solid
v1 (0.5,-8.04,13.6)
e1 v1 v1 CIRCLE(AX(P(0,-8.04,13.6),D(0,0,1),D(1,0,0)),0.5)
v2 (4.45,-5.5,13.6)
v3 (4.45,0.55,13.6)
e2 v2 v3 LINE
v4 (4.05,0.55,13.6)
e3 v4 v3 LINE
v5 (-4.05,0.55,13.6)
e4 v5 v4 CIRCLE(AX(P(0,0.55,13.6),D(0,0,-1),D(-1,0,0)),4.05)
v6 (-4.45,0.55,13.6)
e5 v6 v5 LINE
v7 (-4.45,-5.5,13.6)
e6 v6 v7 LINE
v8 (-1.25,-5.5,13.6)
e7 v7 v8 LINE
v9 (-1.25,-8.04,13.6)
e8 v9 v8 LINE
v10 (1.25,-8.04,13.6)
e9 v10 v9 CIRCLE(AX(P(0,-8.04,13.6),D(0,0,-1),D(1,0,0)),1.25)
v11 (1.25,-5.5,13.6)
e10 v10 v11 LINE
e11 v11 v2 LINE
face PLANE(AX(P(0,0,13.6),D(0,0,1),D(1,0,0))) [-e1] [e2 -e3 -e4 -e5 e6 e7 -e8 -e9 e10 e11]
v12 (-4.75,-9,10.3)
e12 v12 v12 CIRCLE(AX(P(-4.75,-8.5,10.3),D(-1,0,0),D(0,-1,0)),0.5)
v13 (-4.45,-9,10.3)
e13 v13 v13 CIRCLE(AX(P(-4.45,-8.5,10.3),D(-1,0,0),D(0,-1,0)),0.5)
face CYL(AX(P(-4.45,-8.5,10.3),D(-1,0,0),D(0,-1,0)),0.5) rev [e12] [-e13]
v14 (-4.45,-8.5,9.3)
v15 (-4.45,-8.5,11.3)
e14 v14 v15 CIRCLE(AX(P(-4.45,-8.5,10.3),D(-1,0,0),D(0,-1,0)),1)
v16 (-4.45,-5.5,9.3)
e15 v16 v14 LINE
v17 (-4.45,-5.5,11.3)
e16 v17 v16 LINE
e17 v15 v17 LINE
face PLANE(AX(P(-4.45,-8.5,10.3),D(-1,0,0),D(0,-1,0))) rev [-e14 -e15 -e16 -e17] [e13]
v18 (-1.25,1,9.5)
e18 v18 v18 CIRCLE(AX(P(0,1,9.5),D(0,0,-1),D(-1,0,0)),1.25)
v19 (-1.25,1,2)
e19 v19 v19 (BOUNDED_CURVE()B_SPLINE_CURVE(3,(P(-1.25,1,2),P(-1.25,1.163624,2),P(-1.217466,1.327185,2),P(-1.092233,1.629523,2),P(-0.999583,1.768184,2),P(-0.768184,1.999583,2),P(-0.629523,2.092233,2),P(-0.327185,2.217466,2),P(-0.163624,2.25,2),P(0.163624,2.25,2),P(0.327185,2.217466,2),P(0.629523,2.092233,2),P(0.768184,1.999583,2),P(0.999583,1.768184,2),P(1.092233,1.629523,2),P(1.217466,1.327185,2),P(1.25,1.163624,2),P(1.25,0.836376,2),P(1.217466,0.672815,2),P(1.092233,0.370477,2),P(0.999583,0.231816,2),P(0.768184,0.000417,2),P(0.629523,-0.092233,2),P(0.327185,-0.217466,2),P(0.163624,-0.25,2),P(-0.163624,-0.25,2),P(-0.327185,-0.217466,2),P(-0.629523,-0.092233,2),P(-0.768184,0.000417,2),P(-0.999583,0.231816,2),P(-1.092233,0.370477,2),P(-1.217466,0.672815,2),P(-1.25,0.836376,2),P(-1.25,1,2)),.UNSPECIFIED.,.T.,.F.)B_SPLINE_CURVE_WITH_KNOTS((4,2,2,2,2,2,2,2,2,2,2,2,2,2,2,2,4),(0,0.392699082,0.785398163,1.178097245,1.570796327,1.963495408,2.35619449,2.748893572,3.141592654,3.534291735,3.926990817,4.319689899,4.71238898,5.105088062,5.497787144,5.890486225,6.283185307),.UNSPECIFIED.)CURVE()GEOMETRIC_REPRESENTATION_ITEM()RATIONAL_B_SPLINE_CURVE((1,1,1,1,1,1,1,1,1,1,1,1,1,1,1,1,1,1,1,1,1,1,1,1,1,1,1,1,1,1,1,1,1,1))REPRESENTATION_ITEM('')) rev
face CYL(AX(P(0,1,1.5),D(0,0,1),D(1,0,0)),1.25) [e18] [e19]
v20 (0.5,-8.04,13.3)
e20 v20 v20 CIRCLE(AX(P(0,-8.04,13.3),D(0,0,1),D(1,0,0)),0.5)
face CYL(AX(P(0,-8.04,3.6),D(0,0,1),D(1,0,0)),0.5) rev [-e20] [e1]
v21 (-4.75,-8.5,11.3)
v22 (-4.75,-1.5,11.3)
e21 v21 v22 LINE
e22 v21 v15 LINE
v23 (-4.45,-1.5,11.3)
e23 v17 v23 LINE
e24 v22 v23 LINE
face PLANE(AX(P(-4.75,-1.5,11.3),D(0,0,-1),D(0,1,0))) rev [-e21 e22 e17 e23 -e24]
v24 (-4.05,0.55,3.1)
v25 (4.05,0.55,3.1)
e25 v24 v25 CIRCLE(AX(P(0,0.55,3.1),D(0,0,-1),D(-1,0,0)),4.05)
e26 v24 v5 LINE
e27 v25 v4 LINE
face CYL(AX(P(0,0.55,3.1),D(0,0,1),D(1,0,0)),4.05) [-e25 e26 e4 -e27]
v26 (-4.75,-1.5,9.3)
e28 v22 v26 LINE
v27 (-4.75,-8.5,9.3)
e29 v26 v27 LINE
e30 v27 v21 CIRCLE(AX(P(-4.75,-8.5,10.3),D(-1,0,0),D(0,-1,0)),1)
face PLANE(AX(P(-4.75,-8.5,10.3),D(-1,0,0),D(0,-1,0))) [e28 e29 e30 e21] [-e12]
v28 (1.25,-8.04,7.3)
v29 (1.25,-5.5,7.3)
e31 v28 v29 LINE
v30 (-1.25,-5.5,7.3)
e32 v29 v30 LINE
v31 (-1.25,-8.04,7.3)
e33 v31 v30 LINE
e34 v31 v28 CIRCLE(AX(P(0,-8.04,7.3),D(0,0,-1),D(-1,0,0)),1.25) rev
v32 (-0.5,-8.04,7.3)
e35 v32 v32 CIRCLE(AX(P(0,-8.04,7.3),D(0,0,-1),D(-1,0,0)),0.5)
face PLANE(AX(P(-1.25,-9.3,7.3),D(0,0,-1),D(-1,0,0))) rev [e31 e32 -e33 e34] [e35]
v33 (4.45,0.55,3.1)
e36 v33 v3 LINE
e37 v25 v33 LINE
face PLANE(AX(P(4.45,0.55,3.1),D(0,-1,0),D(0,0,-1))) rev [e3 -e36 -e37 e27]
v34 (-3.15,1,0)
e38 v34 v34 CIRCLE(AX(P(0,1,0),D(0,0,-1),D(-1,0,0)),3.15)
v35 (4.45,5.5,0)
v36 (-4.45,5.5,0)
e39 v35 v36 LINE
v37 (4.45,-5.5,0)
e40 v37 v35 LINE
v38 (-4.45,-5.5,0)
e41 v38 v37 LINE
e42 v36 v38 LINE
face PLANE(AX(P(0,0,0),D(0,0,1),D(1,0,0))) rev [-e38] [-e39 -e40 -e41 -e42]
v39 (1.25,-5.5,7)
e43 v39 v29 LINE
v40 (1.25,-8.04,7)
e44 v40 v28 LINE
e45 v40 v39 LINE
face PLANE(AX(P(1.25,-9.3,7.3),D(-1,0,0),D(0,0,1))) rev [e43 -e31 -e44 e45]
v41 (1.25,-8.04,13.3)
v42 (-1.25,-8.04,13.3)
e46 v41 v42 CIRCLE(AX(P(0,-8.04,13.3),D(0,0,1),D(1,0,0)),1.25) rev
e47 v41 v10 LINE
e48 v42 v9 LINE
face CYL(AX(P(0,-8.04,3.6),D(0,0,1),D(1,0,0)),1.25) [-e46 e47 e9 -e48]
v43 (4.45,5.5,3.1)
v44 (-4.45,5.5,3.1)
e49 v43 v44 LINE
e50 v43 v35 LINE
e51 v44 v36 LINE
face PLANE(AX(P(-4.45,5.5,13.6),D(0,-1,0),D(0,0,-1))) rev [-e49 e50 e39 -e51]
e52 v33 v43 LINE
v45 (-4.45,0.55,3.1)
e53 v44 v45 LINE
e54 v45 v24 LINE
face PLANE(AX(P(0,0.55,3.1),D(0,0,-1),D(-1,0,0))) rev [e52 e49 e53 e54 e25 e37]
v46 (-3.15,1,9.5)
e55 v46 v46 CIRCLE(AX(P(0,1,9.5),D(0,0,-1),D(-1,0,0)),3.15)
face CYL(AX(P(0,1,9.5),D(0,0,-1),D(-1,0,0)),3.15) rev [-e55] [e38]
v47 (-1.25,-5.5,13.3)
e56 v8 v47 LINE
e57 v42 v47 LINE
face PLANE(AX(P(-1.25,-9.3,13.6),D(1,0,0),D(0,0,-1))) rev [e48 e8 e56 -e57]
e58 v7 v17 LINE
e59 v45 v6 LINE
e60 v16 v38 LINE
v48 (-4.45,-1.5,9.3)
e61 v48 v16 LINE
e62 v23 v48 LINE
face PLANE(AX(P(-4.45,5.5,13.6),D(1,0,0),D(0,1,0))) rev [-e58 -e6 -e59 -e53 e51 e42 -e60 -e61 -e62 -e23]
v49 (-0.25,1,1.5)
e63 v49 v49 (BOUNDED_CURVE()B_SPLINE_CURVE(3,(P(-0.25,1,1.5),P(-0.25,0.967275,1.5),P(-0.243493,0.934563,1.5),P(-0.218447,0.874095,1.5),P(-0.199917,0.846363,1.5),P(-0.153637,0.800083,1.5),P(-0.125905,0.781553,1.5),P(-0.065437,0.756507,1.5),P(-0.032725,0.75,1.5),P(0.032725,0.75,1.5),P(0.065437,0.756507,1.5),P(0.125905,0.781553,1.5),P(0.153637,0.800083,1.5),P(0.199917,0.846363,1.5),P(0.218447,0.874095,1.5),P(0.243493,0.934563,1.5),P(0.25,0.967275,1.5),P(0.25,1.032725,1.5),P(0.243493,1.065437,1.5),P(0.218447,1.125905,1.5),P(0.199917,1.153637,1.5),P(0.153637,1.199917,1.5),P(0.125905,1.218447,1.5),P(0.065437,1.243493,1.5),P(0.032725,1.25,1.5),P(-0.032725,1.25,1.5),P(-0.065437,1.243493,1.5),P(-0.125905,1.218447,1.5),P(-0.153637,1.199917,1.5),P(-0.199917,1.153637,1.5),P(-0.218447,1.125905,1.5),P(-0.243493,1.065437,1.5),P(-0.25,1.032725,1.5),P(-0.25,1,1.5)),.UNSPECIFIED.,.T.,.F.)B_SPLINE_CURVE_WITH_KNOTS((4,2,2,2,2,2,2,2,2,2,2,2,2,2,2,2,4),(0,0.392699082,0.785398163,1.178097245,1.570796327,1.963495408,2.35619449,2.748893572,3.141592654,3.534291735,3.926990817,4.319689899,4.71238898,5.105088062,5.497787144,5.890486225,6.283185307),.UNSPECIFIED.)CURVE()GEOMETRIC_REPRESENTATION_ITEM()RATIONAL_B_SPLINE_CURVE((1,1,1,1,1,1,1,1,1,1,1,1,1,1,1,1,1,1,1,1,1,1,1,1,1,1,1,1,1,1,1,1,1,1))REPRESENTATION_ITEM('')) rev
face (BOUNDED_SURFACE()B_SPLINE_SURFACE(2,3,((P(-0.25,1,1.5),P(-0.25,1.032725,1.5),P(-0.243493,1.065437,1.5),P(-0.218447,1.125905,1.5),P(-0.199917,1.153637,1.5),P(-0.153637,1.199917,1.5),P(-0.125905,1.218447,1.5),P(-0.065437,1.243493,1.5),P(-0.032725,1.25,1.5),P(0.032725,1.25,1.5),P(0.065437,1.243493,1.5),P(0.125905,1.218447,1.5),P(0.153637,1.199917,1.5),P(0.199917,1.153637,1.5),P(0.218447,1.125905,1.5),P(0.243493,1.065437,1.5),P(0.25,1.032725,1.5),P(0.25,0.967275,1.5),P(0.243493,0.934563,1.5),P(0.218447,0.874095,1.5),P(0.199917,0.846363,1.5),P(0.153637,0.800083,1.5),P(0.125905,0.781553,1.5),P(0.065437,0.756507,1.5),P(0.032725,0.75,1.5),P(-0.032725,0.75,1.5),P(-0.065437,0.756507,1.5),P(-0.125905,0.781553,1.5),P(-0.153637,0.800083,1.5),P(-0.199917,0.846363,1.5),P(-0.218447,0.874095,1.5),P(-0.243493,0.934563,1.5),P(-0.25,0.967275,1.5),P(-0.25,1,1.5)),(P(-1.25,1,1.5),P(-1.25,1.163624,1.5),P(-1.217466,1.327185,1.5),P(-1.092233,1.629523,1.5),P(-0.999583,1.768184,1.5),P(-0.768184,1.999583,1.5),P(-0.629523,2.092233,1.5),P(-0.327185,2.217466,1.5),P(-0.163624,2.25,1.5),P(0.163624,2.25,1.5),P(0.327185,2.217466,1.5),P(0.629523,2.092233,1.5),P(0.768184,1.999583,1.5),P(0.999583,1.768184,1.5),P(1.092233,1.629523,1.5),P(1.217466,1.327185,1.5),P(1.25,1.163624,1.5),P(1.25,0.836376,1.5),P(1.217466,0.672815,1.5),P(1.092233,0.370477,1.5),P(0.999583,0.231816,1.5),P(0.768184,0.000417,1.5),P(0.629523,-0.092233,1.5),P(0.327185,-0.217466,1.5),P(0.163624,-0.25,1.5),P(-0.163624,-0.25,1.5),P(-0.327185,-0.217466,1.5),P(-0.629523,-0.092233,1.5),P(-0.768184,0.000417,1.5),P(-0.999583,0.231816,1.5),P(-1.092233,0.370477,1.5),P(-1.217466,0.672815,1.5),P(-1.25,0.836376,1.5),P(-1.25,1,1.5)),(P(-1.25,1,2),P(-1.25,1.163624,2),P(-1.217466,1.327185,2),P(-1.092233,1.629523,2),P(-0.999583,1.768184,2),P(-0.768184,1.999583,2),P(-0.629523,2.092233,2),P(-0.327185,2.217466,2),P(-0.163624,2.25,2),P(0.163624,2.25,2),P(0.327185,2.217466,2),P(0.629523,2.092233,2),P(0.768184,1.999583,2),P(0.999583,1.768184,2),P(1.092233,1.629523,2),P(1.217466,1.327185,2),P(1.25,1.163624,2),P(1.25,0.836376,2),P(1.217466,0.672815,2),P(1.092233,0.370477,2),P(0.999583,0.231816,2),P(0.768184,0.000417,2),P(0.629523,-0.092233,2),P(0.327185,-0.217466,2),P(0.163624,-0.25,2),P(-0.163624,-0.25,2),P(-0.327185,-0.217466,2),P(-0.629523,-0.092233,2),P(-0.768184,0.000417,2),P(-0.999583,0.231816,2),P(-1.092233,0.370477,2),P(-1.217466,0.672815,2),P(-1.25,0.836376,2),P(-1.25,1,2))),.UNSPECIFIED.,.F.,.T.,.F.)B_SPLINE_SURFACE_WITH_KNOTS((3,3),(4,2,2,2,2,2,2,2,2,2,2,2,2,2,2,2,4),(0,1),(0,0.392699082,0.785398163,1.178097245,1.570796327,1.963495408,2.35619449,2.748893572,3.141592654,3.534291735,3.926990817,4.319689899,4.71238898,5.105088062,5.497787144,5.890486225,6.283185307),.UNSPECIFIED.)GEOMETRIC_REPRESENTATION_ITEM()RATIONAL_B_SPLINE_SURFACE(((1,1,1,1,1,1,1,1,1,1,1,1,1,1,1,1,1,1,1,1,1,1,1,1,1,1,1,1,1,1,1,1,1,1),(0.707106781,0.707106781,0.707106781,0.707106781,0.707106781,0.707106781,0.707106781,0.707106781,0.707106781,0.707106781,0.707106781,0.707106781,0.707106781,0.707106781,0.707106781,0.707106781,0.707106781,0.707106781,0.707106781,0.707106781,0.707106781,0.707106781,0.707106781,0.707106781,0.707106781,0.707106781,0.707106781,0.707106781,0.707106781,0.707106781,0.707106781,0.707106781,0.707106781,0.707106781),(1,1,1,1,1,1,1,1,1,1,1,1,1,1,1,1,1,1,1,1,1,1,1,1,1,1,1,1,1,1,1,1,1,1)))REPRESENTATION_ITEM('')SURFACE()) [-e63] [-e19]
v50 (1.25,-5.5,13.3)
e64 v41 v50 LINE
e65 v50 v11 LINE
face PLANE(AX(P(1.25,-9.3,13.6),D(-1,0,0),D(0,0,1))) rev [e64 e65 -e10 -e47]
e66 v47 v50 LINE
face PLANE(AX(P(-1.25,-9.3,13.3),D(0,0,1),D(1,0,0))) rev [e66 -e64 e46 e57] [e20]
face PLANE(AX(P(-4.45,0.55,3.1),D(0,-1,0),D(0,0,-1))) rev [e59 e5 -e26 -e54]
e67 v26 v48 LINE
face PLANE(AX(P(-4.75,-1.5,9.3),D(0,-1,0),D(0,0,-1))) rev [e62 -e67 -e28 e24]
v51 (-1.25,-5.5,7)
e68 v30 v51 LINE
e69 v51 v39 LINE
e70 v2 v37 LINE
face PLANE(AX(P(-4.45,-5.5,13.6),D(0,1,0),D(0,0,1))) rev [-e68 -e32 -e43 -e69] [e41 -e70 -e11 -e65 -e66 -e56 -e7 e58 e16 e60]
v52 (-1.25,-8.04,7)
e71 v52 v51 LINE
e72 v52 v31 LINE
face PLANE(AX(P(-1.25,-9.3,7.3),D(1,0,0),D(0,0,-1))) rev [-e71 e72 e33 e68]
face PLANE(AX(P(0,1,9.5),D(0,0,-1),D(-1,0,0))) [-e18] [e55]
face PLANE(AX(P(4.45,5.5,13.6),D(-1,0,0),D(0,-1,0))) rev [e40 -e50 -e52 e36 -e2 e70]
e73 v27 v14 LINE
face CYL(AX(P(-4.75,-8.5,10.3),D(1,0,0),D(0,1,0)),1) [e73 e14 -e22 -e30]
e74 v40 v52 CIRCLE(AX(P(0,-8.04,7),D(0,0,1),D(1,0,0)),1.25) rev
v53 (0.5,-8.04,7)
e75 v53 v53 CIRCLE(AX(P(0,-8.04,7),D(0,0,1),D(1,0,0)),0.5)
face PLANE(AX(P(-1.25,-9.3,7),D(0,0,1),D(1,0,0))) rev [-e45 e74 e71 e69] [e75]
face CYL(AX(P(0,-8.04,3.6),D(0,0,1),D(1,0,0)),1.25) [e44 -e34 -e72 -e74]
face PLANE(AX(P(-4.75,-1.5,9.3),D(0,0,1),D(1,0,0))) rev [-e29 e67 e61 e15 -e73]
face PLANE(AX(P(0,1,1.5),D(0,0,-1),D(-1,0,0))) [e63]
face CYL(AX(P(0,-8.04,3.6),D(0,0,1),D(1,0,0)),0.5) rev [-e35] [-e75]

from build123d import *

# Parameters (mm, degrees)
ESBO_O1_W                = 8.9
ESBO_O1_H                = 11
RESSALTO_EXTRUS_O1_DEPTH = 13.6
CORTE_EXTRUS_O1_DEPTH    = 10.5
ESBO_O3_R                = 3.15
CORTE_EXTRUS_O2_DEPTH    = 9.5
ESBO_O4_R                = 1.25
RESSALTO_EXTRUS_O2_DEPTH = 8
FILETE1_SIZE             = 0.5
FILETE1_SIZE_2           = 1
ESBO_O5_W                = 2.5
ESBO_O5_H                = 0.3
RESSALTO_EXTRUS_O3_DEPTH = 3.8
CORTE_EXTRUS_O3_DEPTH    = 10
ESBO_O8_R                = 0.5
CORTE_EXTRUS_O4_DEPTH    = 10
RESSALTO_EXTRUS_O4_DEPTH = 0.3
ESBO_O10_R               = 0.5
CORTE_EXTRUS_O5_DEPTH    = 0.3


with BuildPart() as part:
    # Esboço1 → Ressalto-extrusão1 (new body)
    with BuildSketch(Plane.XY):
        Rectangle(ESBO_O1_W, ESBO_O1_H)
    extrude(amount=RESSALTO_EXTRUS_O1_DEPTH)

    # Esboço2 → Corte-extrusão1 (cut)
    with BuildSketch(Plane.XY.offset(13.6)):
        with BuildLine():
            Line((-4.45, 0.55), (-4.45, 5.5))
            Line((-4.45, 5.5), (4.45, 5.5))
            Line((4.45, 5.5), (4.45, 0.55))
            Line((4.45, 0.55), (4.05, 0.55))
            ThreePointArc((4.05, 0.55), (0, 4.6), (-4.05, 0.55))
            Line((-4.05, 0.55), (-4.45, 0.55))
        make_face()
    extrude(amount=-CORTE_EXTRUS_O1_DEPTH, mode=Mode.SUBTRACT)

    # Esboço3 → Corte-extrusão2 (cut)
    with BuildSketch(Plane(origin=(0, 0, 0), x_dir=(-1, 0, 0), z_dir=(0, 0, -1))):
        with Locations((0, 1)):
            Circle(ESBO_O3_R)
    extrude(amount=-CORTE_EXTRUS_O2_DEPTH, mode=Mode.SUBTRACT)

    # Esboço4 → Ressalto-extrusão2 (add)
    with BuildSketch(Plane(origin=(0, 0, 9.5), x_dir=(-1, 0, 0), z_dir=(0, 0, -1))):
        with Locations((0, 1)):
            Circle(ESBO_O4_R)
    extrude(amount=RESSALTO_EXTRUS_O2_DEPTH)

    # Filete1
    # an asymmetric fillet: 1, 0.5 mm, written as the material it takes off along each edge
    with BuildSketch(Plane(origin=(0, 1, 1.5), x_dir=(-1, 0, 0), z_dir=(0, -1, 0))) as filete1_piece_1:
        with BuildLine():
            Bezier((1.25, -FILETE1_SIZE), (1.25, 0), (1.25 - FILETE1_SIZE_2, 0), weights=[1, 0.707106781, 1])
            Line((1.25 - FILETE1_SIZE_2, 0), (1.25, 0))
            Line((1.25, 0), (1.25, -FILETE1_SIZE))
        make_face()
    revolve(axis=Axis((0, 1, 1.5), (0, 0, -1)), mode=Mode.SUBTRACT)

    # Esboço5 → Ressalto-extrusão3 (add)
    with BuildSketch(Plane.XZ.offset(5.5)):
        with Locations((0, 13.45)):
            Rectangle(ESBO_O5_W, ESBO_O5_H)
        with Locations((0, 7.15)):
            Rectangle(ESBO_O5_W, ESBO_O5_H)
    extrude(amount=RESSALTO_EXTRUS_O3_DEPTH)

    # Esboço7 → Corte-extrusão3 (cut)
    with BuildSketch(Plane.XY.offset(13.6)):
        with BuildLine():
            Line((-1.25, -8.04), (-1.25, -9.3))
            Line((-1.25, -9.3), (1.25, -9.3))
            Line((1.25, -9.3), (1.25, -8.04))
            ThreePointArc((1.25, -8.04), (0, -9.29), (-1.25, -8.04))
        make_face()
    extrude(amount=-CORTE_EXTRUS_O3_DEPTH, mode=Mode.SUBTRACT)

    # Esboço8 → Corte-extrusão4 (cut)
    with BuildSketch(Plane.XY.offset(13.6)):
        with Locations((0, -8.04)):
            Circle(ESBO_O8_R)
    extrude(amount=-CORTE_EXTRUS_O4_DEPTH, mode=Mode.SUBTRACT)

    # Esboço9 → Ressalto-extrusão4 (add)
    with BuildSketch(Plane.ZY.offset(4.45)):
        with BuildLine():
            Line((9.3, -1.5), (11.3, -1.5))
            Line((11.3, -1.5), (11.3, -8.5))
            ThreePointArc((11.3, -8.5), (10.3, -9.5), (9.3, -8.5))
            Line((9.3, -8.5), (9.3, -1.5))
        make_face()
    extrude(amount=RESSALTO_EXTRUS_O4_DEPTH)

    # Esboço10 → Corte-extrusão5 (cut)
    with BuildSketch(Plane.ZY.offset(4.75)):
        with Locations(Location((10.3, -8.5, 0), (0, 0, 270))):
            Circle(ESBO_O10_R)
    extrude(amount=-CORTE_EXTRUS_O5_DEPTH, mode=Mode.SUBTRACT)


solid = part.part
